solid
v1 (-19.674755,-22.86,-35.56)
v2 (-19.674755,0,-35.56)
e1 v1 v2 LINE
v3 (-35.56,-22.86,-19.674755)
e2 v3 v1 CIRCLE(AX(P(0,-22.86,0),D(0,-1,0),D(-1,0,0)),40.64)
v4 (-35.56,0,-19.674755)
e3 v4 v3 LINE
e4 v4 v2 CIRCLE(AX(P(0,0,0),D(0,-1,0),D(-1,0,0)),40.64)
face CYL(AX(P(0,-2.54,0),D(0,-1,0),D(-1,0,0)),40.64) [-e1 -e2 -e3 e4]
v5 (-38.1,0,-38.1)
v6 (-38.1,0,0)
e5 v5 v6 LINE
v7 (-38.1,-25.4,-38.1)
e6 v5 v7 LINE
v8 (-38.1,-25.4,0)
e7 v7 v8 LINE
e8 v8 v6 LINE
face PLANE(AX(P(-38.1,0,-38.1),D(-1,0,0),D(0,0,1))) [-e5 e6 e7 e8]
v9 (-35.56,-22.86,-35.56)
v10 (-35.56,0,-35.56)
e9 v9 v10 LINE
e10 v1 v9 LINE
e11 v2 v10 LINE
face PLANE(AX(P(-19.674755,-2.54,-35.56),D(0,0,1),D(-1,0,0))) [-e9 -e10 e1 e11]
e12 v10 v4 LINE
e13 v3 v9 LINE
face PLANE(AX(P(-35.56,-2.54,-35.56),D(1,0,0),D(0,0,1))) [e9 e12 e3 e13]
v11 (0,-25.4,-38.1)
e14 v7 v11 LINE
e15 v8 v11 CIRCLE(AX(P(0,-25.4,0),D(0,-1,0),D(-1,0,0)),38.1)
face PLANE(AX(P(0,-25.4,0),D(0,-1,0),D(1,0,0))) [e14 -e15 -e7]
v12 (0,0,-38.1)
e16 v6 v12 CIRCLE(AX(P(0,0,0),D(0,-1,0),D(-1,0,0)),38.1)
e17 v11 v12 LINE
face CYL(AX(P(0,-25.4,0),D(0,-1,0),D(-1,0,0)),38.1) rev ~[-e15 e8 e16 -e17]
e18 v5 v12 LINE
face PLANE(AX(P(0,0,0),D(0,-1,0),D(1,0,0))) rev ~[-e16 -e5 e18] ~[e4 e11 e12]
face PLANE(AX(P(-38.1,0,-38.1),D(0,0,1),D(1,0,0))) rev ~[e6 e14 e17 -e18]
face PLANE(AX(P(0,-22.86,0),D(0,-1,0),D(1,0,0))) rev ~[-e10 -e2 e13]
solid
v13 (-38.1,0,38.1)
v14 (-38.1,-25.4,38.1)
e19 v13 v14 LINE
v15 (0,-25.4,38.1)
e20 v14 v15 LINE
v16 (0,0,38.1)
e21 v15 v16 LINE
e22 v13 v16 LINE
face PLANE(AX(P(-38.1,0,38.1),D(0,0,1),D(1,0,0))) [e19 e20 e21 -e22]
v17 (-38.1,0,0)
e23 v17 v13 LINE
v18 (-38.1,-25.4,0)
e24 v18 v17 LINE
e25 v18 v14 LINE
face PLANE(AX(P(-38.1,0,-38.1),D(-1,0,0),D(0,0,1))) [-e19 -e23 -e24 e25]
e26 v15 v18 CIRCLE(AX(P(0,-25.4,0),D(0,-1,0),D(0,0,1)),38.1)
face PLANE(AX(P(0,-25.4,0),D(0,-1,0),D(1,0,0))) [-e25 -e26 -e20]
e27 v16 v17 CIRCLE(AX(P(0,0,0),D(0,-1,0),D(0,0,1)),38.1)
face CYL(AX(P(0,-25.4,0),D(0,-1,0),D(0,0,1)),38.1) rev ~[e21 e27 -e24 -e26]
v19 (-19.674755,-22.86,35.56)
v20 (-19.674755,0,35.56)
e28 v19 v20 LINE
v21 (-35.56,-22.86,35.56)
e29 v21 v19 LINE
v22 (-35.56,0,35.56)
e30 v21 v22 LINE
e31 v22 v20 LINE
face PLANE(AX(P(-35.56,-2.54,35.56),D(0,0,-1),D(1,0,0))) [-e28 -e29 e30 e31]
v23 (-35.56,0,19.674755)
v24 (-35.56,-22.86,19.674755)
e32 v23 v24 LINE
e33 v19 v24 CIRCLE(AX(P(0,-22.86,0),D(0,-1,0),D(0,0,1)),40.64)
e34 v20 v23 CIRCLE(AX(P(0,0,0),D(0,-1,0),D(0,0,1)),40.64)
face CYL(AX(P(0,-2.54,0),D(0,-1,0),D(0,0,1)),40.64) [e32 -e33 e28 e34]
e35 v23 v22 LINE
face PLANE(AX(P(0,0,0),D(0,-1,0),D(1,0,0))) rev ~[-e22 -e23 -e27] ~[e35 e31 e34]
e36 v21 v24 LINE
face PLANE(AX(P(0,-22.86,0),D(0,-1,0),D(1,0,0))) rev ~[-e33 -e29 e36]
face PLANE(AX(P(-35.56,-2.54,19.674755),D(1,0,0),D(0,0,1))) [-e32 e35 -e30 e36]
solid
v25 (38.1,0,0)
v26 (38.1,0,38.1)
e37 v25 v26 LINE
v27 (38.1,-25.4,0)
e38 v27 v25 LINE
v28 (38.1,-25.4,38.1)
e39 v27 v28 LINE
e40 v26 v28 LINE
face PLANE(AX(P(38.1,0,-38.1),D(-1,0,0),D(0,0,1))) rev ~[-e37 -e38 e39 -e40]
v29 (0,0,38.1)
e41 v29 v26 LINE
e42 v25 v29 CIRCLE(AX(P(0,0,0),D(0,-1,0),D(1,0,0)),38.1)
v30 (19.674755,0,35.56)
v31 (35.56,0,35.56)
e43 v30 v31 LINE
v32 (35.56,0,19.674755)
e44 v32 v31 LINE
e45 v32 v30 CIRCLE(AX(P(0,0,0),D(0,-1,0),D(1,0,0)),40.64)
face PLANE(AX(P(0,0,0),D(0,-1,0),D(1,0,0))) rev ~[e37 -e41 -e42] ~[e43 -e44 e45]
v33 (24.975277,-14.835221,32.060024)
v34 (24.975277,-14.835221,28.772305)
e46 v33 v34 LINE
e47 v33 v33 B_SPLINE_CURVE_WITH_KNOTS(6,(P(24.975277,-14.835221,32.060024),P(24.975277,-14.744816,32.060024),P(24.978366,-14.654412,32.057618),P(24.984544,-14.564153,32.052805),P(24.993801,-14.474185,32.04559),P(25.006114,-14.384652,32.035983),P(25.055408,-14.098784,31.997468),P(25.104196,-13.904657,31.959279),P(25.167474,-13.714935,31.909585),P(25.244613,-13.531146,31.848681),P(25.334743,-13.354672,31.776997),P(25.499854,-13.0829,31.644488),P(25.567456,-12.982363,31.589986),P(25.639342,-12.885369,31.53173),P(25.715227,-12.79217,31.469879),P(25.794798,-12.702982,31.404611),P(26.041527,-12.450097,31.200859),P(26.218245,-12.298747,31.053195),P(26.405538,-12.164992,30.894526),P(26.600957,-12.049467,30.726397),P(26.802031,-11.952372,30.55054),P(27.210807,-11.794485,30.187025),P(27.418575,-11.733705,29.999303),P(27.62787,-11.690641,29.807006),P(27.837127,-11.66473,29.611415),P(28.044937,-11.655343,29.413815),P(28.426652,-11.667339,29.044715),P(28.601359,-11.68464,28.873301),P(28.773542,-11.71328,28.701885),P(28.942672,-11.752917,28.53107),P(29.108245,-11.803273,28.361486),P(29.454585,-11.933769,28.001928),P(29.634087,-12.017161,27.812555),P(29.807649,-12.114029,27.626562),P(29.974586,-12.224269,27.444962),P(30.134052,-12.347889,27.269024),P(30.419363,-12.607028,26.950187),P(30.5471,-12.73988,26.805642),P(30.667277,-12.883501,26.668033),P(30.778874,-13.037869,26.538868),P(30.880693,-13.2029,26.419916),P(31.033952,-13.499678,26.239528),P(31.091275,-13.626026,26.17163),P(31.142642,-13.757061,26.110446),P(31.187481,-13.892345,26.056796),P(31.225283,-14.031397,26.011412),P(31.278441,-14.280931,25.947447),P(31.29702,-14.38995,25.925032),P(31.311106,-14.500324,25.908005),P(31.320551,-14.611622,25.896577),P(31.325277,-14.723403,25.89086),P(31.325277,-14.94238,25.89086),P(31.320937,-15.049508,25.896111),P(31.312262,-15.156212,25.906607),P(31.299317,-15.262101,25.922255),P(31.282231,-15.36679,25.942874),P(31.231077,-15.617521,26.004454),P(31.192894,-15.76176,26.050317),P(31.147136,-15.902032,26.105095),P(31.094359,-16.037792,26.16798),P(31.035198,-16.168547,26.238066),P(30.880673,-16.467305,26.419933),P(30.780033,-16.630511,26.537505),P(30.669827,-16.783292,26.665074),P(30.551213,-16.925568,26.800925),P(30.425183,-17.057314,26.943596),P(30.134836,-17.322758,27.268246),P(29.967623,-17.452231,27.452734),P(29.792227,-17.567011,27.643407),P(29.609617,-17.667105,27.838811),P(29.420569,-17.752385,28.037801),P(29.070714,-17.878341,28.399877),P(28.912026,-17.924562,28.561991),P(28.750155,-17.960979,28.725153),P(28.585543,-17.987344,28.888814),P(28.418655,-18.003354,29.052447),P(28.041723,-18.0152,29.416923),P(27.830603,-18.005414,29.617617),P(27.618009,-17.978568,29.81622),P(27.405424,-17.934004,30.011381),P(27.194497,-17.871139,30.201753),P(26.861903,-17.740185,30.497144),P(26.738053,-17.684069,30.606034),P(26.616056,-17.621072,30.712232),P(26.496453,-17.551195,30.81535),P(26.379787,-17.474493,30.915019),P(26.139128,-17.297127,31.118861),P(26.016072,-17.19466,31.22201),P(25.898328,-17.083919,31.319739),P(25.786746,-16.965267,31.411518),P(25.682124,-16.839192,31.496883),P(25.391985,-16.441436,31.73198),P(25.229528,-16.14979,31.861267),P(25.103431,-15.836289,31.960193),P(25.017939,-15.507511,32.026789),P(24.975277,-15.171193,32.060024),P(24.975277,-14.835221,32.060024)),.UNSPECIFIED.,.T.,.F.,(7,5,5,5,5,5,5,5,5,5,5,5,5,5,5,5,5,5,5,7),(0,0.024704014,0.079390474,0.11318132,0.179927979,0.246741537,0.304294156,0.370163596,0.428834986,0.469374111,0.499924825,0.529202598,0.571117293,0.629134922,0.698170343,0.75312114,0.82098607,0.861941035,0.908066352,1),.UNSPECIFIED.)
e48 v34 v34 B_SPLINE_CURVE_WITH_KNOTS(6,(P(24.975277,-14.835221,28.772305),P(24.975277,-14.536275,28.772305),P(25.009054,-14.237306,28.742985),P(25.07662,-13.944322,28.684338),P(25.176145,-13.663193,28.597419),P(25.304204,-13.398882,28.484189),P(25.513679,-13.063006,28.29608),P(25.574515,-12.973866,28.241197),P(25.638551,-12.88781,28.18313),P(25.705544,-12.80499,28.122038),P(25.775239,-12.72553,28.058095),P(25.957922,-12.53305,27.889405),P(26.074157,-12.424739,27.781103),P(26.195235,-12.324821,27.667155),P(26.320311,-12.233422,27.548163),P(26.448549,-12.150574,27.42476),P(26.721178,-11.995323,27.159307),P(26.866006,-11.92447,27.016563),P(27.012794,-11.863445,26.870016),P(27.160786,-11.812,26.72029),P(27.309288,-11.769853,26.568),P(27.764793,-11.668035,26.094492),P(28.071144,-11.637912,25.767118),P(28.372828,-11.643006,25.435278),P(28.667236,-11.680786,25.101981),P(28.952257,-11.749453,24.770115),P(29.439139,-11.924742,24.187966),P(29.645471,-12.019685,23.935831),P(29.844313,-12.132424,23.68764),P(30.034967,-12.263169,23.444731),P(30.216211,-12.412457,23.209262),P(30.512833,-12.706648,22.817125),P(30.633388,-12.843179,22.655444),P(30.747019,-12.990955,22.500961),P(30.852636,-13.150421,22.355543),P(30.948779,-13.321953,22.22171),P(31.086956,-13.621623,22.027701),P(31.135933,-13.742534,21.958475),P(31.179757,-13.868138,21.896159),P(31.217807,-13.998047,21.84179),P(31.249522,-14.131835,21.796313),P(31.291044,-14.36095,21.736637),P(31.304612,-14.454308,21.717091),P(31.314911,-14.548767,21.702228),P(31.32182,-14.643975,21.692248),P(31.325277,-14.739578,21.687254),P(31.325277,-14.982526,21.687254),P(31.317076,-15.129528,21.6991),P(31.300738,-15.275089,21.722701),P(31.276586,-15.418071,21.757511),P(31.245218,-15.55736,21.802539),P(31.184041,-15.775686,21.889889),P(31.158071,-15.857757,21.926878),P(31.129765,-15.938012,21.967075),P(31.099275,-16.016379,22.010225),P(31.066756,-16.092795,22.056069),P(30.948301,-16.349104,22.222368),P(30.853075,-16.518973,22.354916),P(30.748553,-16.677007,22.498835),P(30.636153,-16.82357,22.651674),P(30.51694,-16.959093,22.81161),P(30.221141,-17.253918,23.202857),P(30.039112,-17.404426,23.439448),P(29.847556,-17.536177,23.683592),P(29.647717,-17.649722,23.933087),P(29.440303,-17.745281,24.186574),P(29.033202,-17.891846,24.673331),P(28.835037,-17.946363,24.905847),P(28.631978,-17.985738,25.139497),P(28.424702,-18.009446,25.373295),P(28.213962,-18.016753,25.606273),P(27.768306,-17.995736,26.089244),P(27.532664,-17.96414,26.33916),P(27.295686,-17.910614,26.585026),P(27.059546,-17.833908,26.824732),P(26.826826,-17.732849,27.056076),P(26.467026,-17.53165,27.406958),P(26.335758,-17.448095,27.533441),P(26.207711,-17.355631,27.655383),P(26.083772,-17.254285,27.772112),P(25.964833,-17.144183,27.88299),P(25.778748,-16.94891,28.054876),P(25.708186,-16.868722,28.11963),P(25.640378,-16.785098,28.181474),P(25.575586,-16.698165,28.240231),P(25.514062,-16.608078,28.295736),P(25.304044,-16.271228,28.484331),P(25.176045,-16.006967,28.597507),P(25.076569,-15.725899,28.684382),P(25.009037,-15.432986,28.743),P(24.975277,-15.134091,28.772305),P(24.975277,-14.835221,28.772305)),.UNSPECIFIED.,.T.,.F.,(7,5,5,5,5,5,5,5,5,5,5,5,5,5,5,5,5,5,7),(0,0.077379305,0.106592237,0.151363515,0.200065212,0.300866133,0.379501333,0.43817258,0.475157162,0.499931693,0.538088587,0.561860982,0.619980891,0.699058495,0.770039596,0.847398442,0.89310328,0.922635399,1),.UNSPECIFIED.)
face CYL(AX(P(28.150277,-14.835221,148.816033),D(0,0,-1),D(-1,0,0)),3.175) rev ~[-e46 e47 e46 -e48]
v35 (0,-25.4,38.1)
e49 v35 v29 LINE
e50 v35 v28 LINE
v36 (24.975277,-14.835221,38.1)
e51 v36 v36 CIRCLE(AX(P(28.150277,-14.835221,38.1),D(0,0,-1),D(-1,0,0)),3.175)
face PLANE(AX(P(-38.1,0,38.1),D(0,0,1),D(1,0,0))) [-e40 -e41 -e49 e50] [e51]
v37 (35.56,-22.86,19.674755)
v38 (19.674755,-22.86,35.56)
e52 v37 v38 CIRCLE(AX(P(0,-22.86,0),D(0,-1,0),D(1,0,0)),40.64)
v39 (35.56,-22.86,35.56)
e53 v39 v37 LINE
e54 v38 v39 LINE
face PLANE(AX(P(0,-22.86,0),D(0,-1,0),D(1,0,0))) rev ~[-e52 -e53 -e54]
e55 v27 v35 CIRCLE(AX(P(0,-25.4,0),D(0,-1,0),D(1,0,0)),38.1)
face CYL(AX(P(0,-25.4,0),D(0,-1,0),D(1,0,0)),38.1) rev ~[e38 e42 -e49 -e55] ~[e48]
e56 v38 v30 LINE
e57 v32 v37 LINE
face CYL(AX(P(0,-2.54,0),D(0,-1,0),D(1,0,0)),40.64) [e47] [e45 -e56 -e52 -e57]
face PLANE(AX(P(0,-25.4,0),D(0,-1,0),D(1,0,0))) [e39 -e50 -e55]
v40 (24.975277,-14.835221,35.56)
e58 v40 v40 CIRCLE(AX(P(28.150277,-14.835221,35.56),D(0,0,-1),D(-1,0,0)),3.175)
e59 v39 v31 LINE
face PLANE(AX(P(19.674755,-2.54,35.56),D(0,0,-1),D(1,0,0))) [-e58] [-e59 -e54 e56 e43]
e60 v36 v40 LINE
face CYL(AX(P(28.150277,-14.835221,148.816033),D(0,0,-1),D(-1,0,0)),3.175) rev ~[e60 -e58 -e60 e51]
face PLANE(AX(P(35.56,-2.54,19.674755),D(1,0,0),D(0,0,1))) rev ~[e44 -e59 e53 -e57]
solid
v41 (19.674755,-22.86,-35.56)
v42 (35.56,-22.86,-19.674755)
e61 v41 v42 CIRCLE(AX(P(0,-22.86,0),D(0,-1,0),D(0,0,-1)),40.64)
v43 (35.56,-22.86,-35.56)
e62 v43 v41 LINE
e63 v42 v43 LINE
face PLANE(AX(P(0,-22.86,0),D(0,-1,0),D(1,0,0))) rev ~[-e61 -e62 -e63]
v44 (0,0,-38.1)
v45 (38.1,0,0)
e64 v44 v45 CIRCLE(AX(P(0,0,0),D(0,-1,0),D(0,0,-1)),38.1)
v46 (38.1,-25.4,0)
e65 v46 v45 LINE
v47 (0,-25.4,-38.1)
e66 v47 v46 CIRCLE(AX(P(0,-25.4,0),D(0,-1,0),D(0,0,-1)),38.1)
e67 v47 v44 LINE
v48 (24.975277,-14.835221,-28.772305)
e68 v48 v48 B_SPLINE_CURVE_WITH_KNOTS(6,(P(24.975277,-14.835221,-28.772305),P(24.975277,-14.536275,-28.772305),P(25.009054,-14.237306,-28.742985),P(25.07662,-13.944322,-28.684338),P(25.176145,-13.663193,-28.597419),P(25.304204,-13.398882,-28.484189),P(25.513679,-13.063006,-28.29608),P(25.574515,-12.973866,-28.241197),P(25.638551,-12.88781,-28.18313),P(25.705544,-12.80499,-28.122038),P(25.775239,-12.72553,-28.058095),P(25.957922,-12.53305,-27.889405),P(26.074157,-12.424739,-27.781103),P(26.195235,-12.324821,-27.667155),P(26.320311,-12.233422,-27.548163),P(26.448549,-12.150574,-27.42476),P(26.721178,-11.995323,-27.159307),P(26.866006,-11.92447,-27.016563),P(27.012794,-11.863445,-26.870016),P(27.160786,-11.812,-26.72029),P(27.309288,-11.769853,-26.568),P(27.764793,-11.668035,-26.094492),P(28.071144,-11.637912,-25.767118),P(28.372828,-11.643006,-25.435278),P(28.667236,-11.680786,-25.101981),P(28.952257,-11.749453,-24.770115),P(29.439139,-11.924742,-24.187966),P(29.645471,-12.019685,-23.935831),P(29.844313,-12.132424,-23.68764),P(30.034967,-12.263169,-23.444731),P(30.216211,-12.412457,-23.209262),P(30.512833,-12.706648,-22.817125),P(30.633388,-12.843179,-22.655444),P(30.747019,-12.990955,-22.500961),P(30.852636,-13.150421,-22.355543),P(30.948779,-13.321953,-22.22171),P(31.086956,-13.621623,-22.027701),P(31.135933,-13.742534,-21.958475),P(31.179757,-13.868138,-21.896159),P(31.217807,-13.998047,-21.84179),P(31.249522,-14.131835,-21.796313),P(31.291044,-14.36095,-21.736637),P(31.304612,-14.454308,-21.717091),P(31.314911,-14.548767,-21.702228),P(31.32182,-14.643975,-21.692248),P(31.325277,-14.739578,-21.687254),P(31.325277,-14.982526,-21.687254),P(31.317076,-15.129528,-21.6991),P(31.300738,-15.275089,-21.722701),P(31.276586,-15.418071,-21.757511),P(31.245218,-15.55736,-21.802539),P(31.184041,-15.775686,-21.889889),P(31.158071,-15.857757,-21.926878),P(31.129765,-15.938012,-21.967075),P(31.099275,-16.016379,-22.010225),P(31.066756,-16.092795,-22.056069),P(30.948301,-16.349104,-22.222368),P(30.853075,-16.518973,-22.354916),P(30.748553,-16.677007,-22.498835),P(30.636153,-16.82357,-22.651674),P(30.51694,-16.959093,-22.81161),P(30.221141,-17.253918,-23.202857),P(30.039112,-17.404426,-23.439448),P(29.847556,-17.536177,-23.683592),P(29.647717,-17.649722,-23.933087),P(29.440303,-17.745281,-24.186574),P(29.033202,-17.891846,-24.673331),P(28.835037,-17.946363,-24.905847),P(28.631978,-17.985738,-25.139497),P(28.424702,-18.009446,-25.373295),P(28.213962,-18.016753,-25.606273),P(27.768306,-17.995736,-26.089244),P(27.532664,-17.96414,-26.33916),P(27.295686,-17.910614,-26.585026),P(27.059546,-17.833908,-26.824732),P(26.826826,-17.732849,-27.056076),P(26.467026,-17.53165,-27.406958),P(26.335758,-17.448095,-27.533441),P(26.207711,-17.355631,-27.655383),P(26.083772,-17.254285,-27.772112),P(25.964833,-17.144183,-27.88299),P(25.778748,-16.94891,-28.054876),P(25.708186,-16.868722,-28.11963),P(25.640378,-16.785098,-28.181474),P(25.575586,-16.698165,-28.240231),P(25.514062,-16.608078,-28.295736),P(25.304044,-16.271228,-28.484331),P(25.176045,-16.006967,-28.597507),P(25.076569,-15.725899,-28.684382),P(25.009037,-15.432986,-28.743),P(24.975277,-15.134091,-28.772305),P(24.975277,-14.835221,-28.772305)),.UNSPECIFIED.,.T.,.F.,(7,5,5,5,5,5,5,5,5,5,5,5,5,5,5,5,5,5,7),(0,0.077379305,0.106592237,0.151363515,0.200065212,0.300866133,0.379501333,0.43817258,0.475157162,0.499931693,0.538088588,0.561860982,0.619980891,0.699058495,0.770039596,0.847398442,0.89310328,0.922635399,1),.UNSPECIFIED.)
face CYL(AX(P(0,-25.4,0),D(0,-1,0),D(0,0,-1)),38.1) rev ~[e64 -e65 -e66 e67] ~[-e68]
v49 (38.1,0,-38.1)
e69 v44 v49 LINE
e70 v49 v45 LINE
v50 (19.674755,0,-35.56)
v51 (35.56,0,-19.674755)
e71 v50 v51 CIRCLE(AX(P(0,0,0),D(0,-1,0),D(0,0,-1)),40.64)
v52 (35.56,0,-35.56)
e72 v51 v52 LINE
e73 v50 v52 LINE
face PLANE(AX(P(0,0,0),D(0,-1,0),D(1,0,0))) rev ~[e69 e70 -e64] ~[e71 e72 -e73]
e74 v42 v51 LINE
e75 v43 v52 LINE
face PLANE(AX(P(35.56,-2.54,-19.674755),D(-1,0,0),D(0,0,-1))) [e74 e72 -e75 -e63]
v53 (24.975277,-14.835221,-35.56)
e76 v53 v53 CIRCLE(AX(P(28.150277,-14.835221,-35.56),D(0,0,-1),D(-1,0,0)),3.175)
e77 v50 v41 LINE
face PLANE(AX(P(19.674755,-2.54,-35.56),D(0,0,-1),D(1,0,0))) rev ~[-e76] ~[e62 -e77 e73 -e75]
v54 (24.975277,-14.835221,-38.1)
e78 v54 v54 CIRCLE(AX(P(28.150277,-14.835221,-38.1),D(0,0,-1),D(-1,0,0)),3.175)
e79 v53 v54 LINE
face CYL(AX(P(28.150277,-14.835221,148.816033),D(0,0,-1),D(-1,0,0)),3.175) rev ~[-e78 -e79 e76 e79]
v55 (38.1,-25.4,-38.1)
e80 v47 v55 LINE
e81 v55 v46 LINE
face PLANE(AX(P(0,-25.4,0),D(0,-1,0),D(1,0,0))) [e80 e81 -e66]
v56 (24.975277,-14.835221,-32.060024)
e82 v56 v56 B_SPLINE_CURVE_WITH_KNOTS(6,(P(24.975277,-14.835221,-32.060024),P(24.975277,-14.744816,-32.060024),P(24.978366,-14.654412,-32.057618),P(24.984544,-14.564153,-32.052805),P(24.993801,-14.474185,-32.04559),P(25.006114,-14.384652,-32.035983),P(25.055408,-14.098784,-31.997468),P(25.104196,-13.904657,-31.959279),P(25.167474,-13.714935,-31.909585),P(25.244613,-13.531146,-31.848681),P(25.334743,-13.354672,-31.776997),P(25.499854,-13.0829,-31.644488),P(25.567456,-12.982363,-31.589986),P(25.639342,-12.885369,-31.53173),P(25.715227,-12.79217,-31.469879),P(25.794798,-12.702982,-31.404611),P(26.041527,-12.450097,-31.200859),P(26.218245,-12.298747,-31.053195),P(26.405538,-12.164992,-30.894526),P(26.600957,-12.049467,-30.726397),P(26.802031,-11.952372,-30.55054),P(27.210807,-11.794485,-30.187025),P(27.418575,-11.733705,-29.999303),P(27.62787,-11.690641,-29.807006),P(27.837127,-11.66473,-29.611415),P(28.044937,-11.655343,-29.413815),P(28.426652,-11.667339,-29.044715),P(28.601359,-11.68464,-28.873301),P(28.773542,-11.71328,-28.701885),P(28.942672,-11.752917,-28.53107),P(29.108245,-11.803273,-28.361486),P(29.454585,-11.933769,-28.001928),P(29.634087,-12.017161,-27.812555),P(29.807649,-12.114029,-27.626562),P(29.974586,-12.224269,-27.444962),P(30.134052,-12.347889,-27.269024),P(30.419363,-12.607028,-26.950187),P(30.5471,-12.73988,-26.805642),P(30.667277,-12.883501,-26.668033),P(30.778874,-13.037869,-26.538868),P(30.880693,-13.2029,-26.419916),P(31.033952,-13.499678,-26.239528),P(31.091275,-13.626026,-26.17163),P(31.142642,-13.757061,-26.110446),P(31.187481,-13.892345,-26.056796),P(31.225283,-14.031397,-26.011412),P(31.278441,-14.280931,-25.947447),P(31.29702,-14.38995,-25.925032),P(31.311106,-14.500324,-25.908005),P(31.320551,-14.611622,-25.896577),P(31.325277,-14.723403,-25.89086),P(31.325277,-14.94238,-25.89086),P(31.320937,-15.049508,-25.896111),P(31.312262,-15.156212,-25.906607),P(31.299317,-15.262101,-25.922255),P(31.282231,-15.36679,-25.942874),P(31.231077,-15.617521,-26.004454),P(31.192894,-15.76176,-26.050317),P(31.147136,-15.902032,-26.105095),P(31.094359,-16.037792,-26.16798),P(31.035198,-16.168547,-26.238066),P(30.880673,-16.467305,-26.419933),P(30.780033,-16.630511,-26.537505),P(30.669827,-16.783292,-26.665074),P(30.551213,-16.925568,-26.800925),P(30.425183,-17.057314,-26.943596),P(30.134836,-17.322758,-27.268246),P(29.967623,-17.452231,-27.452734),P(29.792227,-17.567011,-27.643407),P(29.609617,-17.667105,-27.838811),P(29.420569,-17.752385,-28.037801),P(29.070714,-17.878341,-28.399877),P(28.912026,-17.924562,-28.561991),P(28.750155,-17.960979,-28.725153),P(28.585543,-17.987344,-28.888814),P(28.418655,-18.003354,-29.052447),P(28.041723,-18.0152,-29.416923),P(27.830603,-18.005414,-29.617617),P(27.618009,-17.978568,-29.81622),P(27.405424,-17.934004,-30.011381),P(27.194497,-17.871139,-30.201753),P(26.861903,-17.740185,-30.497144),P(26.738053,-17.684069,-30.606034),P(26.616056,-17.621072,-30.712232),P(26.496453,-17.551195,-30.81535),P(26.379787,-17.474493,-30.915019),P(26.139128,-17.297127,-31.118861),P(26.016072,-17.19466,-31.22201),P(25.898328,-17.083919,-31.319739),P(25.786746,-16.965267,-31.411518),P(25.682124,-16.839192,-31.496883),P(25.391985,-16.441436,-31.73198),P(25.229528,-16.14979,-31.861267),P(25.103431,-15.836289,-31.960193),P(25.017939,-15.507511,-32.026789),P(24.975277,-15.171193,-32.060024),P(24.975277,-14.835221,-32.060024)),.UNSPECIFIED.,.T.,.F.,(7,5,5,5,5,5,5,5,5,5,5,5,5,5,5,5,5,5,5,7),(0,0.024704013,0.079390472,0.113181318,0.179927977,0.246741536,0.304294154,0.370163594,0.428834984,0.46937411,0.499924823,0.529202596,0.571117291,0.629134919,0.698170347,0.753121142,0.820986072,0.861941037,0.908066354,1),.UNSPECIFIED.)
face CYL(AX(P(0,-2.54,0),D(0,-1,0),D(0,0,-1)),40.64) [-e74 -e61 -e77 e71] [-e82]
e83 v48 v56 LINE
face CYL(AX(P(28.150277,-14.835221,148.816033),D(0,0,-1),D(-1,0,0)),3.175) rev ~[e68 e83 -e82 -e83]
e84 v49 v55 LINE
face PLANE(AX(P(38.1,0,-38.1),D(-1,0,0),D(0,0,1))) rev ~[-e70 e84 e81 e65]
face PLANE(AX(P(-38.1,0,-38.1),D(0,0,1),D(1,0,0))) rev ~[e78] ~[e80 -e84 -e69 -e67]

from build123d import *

# Parameters (mm, degrees)
F0_W     = 76.2
F0_H     = 76.2
F1_DEPTH = 25.4
F3_DEPTH = 25.4
F4_T     = -2.54
F6_D     = 6.35


# Not quite as in the source:
# - a shell that OpenCascade refuses in one call is made with other operations: the cavity is built on its own and cut out


with BuildPart() as f1:
    # F0 (on Front) → F1 (new body)
    with BuildSketch(Plane.XZ):
        Rectangle(F0_W, F0_H)
    extrude(amount=F1_DEPTH)

    # F2 (on face) → F3 (cut)
    with BuildSketch(Plane.XZ.offset(25.4)):
        with BuildLine():
            ThreePointArc((0, -38.1), (26.9407683632, -26.9407683632), (38.1, 0))
            ThreePointArc((38.1, 0), (26.9407683632, 26.9407683632), (0, 38.1))
            ThreePointArc((0, 38.1), (-26.9407683632, 26.9407683632), (-38.1, 0))
            ThreePointArc((-38.1, 0), (-26.9407683632, -26.9407683632), (0, -38.1))
        make_face()
    extrude(amount=-F3_DEPTH, mode=Mode.SUBTRACT)

    # F4: a shell. OpenCascade refuses it in one call, so the cavity is built on its own and cut out:
    # the body offset inwards by the wall thickness, plus a prism from it out through each open face.
    f4_core = offset(f1.part, amount=F4_T, mode=Mode.PRIVATE)
    f4_exits = [f4_core.faces().sort_by_distance(p)[0] for p in [
        (30.776271, -2.54, 30.776271),
        (-30.776271, -2.54, 30.776271),
        (-30.776271, -2.54, -30.776271),
        (30.776271, -2.54, -30.776271),
    ]]
    add(f4_core, mode=Mode.SUBTRACT)
    extrude(f4_exits, amount=-F4_T, mode=Mode.SUBTRACT)

    # F6 (through all)
    with Locations(Plane.XY.offset(38.1)):
        with Locations((28.1502772123, -14.8352207616)):
            Hole(F6_D / 2)


solid = f1.part
